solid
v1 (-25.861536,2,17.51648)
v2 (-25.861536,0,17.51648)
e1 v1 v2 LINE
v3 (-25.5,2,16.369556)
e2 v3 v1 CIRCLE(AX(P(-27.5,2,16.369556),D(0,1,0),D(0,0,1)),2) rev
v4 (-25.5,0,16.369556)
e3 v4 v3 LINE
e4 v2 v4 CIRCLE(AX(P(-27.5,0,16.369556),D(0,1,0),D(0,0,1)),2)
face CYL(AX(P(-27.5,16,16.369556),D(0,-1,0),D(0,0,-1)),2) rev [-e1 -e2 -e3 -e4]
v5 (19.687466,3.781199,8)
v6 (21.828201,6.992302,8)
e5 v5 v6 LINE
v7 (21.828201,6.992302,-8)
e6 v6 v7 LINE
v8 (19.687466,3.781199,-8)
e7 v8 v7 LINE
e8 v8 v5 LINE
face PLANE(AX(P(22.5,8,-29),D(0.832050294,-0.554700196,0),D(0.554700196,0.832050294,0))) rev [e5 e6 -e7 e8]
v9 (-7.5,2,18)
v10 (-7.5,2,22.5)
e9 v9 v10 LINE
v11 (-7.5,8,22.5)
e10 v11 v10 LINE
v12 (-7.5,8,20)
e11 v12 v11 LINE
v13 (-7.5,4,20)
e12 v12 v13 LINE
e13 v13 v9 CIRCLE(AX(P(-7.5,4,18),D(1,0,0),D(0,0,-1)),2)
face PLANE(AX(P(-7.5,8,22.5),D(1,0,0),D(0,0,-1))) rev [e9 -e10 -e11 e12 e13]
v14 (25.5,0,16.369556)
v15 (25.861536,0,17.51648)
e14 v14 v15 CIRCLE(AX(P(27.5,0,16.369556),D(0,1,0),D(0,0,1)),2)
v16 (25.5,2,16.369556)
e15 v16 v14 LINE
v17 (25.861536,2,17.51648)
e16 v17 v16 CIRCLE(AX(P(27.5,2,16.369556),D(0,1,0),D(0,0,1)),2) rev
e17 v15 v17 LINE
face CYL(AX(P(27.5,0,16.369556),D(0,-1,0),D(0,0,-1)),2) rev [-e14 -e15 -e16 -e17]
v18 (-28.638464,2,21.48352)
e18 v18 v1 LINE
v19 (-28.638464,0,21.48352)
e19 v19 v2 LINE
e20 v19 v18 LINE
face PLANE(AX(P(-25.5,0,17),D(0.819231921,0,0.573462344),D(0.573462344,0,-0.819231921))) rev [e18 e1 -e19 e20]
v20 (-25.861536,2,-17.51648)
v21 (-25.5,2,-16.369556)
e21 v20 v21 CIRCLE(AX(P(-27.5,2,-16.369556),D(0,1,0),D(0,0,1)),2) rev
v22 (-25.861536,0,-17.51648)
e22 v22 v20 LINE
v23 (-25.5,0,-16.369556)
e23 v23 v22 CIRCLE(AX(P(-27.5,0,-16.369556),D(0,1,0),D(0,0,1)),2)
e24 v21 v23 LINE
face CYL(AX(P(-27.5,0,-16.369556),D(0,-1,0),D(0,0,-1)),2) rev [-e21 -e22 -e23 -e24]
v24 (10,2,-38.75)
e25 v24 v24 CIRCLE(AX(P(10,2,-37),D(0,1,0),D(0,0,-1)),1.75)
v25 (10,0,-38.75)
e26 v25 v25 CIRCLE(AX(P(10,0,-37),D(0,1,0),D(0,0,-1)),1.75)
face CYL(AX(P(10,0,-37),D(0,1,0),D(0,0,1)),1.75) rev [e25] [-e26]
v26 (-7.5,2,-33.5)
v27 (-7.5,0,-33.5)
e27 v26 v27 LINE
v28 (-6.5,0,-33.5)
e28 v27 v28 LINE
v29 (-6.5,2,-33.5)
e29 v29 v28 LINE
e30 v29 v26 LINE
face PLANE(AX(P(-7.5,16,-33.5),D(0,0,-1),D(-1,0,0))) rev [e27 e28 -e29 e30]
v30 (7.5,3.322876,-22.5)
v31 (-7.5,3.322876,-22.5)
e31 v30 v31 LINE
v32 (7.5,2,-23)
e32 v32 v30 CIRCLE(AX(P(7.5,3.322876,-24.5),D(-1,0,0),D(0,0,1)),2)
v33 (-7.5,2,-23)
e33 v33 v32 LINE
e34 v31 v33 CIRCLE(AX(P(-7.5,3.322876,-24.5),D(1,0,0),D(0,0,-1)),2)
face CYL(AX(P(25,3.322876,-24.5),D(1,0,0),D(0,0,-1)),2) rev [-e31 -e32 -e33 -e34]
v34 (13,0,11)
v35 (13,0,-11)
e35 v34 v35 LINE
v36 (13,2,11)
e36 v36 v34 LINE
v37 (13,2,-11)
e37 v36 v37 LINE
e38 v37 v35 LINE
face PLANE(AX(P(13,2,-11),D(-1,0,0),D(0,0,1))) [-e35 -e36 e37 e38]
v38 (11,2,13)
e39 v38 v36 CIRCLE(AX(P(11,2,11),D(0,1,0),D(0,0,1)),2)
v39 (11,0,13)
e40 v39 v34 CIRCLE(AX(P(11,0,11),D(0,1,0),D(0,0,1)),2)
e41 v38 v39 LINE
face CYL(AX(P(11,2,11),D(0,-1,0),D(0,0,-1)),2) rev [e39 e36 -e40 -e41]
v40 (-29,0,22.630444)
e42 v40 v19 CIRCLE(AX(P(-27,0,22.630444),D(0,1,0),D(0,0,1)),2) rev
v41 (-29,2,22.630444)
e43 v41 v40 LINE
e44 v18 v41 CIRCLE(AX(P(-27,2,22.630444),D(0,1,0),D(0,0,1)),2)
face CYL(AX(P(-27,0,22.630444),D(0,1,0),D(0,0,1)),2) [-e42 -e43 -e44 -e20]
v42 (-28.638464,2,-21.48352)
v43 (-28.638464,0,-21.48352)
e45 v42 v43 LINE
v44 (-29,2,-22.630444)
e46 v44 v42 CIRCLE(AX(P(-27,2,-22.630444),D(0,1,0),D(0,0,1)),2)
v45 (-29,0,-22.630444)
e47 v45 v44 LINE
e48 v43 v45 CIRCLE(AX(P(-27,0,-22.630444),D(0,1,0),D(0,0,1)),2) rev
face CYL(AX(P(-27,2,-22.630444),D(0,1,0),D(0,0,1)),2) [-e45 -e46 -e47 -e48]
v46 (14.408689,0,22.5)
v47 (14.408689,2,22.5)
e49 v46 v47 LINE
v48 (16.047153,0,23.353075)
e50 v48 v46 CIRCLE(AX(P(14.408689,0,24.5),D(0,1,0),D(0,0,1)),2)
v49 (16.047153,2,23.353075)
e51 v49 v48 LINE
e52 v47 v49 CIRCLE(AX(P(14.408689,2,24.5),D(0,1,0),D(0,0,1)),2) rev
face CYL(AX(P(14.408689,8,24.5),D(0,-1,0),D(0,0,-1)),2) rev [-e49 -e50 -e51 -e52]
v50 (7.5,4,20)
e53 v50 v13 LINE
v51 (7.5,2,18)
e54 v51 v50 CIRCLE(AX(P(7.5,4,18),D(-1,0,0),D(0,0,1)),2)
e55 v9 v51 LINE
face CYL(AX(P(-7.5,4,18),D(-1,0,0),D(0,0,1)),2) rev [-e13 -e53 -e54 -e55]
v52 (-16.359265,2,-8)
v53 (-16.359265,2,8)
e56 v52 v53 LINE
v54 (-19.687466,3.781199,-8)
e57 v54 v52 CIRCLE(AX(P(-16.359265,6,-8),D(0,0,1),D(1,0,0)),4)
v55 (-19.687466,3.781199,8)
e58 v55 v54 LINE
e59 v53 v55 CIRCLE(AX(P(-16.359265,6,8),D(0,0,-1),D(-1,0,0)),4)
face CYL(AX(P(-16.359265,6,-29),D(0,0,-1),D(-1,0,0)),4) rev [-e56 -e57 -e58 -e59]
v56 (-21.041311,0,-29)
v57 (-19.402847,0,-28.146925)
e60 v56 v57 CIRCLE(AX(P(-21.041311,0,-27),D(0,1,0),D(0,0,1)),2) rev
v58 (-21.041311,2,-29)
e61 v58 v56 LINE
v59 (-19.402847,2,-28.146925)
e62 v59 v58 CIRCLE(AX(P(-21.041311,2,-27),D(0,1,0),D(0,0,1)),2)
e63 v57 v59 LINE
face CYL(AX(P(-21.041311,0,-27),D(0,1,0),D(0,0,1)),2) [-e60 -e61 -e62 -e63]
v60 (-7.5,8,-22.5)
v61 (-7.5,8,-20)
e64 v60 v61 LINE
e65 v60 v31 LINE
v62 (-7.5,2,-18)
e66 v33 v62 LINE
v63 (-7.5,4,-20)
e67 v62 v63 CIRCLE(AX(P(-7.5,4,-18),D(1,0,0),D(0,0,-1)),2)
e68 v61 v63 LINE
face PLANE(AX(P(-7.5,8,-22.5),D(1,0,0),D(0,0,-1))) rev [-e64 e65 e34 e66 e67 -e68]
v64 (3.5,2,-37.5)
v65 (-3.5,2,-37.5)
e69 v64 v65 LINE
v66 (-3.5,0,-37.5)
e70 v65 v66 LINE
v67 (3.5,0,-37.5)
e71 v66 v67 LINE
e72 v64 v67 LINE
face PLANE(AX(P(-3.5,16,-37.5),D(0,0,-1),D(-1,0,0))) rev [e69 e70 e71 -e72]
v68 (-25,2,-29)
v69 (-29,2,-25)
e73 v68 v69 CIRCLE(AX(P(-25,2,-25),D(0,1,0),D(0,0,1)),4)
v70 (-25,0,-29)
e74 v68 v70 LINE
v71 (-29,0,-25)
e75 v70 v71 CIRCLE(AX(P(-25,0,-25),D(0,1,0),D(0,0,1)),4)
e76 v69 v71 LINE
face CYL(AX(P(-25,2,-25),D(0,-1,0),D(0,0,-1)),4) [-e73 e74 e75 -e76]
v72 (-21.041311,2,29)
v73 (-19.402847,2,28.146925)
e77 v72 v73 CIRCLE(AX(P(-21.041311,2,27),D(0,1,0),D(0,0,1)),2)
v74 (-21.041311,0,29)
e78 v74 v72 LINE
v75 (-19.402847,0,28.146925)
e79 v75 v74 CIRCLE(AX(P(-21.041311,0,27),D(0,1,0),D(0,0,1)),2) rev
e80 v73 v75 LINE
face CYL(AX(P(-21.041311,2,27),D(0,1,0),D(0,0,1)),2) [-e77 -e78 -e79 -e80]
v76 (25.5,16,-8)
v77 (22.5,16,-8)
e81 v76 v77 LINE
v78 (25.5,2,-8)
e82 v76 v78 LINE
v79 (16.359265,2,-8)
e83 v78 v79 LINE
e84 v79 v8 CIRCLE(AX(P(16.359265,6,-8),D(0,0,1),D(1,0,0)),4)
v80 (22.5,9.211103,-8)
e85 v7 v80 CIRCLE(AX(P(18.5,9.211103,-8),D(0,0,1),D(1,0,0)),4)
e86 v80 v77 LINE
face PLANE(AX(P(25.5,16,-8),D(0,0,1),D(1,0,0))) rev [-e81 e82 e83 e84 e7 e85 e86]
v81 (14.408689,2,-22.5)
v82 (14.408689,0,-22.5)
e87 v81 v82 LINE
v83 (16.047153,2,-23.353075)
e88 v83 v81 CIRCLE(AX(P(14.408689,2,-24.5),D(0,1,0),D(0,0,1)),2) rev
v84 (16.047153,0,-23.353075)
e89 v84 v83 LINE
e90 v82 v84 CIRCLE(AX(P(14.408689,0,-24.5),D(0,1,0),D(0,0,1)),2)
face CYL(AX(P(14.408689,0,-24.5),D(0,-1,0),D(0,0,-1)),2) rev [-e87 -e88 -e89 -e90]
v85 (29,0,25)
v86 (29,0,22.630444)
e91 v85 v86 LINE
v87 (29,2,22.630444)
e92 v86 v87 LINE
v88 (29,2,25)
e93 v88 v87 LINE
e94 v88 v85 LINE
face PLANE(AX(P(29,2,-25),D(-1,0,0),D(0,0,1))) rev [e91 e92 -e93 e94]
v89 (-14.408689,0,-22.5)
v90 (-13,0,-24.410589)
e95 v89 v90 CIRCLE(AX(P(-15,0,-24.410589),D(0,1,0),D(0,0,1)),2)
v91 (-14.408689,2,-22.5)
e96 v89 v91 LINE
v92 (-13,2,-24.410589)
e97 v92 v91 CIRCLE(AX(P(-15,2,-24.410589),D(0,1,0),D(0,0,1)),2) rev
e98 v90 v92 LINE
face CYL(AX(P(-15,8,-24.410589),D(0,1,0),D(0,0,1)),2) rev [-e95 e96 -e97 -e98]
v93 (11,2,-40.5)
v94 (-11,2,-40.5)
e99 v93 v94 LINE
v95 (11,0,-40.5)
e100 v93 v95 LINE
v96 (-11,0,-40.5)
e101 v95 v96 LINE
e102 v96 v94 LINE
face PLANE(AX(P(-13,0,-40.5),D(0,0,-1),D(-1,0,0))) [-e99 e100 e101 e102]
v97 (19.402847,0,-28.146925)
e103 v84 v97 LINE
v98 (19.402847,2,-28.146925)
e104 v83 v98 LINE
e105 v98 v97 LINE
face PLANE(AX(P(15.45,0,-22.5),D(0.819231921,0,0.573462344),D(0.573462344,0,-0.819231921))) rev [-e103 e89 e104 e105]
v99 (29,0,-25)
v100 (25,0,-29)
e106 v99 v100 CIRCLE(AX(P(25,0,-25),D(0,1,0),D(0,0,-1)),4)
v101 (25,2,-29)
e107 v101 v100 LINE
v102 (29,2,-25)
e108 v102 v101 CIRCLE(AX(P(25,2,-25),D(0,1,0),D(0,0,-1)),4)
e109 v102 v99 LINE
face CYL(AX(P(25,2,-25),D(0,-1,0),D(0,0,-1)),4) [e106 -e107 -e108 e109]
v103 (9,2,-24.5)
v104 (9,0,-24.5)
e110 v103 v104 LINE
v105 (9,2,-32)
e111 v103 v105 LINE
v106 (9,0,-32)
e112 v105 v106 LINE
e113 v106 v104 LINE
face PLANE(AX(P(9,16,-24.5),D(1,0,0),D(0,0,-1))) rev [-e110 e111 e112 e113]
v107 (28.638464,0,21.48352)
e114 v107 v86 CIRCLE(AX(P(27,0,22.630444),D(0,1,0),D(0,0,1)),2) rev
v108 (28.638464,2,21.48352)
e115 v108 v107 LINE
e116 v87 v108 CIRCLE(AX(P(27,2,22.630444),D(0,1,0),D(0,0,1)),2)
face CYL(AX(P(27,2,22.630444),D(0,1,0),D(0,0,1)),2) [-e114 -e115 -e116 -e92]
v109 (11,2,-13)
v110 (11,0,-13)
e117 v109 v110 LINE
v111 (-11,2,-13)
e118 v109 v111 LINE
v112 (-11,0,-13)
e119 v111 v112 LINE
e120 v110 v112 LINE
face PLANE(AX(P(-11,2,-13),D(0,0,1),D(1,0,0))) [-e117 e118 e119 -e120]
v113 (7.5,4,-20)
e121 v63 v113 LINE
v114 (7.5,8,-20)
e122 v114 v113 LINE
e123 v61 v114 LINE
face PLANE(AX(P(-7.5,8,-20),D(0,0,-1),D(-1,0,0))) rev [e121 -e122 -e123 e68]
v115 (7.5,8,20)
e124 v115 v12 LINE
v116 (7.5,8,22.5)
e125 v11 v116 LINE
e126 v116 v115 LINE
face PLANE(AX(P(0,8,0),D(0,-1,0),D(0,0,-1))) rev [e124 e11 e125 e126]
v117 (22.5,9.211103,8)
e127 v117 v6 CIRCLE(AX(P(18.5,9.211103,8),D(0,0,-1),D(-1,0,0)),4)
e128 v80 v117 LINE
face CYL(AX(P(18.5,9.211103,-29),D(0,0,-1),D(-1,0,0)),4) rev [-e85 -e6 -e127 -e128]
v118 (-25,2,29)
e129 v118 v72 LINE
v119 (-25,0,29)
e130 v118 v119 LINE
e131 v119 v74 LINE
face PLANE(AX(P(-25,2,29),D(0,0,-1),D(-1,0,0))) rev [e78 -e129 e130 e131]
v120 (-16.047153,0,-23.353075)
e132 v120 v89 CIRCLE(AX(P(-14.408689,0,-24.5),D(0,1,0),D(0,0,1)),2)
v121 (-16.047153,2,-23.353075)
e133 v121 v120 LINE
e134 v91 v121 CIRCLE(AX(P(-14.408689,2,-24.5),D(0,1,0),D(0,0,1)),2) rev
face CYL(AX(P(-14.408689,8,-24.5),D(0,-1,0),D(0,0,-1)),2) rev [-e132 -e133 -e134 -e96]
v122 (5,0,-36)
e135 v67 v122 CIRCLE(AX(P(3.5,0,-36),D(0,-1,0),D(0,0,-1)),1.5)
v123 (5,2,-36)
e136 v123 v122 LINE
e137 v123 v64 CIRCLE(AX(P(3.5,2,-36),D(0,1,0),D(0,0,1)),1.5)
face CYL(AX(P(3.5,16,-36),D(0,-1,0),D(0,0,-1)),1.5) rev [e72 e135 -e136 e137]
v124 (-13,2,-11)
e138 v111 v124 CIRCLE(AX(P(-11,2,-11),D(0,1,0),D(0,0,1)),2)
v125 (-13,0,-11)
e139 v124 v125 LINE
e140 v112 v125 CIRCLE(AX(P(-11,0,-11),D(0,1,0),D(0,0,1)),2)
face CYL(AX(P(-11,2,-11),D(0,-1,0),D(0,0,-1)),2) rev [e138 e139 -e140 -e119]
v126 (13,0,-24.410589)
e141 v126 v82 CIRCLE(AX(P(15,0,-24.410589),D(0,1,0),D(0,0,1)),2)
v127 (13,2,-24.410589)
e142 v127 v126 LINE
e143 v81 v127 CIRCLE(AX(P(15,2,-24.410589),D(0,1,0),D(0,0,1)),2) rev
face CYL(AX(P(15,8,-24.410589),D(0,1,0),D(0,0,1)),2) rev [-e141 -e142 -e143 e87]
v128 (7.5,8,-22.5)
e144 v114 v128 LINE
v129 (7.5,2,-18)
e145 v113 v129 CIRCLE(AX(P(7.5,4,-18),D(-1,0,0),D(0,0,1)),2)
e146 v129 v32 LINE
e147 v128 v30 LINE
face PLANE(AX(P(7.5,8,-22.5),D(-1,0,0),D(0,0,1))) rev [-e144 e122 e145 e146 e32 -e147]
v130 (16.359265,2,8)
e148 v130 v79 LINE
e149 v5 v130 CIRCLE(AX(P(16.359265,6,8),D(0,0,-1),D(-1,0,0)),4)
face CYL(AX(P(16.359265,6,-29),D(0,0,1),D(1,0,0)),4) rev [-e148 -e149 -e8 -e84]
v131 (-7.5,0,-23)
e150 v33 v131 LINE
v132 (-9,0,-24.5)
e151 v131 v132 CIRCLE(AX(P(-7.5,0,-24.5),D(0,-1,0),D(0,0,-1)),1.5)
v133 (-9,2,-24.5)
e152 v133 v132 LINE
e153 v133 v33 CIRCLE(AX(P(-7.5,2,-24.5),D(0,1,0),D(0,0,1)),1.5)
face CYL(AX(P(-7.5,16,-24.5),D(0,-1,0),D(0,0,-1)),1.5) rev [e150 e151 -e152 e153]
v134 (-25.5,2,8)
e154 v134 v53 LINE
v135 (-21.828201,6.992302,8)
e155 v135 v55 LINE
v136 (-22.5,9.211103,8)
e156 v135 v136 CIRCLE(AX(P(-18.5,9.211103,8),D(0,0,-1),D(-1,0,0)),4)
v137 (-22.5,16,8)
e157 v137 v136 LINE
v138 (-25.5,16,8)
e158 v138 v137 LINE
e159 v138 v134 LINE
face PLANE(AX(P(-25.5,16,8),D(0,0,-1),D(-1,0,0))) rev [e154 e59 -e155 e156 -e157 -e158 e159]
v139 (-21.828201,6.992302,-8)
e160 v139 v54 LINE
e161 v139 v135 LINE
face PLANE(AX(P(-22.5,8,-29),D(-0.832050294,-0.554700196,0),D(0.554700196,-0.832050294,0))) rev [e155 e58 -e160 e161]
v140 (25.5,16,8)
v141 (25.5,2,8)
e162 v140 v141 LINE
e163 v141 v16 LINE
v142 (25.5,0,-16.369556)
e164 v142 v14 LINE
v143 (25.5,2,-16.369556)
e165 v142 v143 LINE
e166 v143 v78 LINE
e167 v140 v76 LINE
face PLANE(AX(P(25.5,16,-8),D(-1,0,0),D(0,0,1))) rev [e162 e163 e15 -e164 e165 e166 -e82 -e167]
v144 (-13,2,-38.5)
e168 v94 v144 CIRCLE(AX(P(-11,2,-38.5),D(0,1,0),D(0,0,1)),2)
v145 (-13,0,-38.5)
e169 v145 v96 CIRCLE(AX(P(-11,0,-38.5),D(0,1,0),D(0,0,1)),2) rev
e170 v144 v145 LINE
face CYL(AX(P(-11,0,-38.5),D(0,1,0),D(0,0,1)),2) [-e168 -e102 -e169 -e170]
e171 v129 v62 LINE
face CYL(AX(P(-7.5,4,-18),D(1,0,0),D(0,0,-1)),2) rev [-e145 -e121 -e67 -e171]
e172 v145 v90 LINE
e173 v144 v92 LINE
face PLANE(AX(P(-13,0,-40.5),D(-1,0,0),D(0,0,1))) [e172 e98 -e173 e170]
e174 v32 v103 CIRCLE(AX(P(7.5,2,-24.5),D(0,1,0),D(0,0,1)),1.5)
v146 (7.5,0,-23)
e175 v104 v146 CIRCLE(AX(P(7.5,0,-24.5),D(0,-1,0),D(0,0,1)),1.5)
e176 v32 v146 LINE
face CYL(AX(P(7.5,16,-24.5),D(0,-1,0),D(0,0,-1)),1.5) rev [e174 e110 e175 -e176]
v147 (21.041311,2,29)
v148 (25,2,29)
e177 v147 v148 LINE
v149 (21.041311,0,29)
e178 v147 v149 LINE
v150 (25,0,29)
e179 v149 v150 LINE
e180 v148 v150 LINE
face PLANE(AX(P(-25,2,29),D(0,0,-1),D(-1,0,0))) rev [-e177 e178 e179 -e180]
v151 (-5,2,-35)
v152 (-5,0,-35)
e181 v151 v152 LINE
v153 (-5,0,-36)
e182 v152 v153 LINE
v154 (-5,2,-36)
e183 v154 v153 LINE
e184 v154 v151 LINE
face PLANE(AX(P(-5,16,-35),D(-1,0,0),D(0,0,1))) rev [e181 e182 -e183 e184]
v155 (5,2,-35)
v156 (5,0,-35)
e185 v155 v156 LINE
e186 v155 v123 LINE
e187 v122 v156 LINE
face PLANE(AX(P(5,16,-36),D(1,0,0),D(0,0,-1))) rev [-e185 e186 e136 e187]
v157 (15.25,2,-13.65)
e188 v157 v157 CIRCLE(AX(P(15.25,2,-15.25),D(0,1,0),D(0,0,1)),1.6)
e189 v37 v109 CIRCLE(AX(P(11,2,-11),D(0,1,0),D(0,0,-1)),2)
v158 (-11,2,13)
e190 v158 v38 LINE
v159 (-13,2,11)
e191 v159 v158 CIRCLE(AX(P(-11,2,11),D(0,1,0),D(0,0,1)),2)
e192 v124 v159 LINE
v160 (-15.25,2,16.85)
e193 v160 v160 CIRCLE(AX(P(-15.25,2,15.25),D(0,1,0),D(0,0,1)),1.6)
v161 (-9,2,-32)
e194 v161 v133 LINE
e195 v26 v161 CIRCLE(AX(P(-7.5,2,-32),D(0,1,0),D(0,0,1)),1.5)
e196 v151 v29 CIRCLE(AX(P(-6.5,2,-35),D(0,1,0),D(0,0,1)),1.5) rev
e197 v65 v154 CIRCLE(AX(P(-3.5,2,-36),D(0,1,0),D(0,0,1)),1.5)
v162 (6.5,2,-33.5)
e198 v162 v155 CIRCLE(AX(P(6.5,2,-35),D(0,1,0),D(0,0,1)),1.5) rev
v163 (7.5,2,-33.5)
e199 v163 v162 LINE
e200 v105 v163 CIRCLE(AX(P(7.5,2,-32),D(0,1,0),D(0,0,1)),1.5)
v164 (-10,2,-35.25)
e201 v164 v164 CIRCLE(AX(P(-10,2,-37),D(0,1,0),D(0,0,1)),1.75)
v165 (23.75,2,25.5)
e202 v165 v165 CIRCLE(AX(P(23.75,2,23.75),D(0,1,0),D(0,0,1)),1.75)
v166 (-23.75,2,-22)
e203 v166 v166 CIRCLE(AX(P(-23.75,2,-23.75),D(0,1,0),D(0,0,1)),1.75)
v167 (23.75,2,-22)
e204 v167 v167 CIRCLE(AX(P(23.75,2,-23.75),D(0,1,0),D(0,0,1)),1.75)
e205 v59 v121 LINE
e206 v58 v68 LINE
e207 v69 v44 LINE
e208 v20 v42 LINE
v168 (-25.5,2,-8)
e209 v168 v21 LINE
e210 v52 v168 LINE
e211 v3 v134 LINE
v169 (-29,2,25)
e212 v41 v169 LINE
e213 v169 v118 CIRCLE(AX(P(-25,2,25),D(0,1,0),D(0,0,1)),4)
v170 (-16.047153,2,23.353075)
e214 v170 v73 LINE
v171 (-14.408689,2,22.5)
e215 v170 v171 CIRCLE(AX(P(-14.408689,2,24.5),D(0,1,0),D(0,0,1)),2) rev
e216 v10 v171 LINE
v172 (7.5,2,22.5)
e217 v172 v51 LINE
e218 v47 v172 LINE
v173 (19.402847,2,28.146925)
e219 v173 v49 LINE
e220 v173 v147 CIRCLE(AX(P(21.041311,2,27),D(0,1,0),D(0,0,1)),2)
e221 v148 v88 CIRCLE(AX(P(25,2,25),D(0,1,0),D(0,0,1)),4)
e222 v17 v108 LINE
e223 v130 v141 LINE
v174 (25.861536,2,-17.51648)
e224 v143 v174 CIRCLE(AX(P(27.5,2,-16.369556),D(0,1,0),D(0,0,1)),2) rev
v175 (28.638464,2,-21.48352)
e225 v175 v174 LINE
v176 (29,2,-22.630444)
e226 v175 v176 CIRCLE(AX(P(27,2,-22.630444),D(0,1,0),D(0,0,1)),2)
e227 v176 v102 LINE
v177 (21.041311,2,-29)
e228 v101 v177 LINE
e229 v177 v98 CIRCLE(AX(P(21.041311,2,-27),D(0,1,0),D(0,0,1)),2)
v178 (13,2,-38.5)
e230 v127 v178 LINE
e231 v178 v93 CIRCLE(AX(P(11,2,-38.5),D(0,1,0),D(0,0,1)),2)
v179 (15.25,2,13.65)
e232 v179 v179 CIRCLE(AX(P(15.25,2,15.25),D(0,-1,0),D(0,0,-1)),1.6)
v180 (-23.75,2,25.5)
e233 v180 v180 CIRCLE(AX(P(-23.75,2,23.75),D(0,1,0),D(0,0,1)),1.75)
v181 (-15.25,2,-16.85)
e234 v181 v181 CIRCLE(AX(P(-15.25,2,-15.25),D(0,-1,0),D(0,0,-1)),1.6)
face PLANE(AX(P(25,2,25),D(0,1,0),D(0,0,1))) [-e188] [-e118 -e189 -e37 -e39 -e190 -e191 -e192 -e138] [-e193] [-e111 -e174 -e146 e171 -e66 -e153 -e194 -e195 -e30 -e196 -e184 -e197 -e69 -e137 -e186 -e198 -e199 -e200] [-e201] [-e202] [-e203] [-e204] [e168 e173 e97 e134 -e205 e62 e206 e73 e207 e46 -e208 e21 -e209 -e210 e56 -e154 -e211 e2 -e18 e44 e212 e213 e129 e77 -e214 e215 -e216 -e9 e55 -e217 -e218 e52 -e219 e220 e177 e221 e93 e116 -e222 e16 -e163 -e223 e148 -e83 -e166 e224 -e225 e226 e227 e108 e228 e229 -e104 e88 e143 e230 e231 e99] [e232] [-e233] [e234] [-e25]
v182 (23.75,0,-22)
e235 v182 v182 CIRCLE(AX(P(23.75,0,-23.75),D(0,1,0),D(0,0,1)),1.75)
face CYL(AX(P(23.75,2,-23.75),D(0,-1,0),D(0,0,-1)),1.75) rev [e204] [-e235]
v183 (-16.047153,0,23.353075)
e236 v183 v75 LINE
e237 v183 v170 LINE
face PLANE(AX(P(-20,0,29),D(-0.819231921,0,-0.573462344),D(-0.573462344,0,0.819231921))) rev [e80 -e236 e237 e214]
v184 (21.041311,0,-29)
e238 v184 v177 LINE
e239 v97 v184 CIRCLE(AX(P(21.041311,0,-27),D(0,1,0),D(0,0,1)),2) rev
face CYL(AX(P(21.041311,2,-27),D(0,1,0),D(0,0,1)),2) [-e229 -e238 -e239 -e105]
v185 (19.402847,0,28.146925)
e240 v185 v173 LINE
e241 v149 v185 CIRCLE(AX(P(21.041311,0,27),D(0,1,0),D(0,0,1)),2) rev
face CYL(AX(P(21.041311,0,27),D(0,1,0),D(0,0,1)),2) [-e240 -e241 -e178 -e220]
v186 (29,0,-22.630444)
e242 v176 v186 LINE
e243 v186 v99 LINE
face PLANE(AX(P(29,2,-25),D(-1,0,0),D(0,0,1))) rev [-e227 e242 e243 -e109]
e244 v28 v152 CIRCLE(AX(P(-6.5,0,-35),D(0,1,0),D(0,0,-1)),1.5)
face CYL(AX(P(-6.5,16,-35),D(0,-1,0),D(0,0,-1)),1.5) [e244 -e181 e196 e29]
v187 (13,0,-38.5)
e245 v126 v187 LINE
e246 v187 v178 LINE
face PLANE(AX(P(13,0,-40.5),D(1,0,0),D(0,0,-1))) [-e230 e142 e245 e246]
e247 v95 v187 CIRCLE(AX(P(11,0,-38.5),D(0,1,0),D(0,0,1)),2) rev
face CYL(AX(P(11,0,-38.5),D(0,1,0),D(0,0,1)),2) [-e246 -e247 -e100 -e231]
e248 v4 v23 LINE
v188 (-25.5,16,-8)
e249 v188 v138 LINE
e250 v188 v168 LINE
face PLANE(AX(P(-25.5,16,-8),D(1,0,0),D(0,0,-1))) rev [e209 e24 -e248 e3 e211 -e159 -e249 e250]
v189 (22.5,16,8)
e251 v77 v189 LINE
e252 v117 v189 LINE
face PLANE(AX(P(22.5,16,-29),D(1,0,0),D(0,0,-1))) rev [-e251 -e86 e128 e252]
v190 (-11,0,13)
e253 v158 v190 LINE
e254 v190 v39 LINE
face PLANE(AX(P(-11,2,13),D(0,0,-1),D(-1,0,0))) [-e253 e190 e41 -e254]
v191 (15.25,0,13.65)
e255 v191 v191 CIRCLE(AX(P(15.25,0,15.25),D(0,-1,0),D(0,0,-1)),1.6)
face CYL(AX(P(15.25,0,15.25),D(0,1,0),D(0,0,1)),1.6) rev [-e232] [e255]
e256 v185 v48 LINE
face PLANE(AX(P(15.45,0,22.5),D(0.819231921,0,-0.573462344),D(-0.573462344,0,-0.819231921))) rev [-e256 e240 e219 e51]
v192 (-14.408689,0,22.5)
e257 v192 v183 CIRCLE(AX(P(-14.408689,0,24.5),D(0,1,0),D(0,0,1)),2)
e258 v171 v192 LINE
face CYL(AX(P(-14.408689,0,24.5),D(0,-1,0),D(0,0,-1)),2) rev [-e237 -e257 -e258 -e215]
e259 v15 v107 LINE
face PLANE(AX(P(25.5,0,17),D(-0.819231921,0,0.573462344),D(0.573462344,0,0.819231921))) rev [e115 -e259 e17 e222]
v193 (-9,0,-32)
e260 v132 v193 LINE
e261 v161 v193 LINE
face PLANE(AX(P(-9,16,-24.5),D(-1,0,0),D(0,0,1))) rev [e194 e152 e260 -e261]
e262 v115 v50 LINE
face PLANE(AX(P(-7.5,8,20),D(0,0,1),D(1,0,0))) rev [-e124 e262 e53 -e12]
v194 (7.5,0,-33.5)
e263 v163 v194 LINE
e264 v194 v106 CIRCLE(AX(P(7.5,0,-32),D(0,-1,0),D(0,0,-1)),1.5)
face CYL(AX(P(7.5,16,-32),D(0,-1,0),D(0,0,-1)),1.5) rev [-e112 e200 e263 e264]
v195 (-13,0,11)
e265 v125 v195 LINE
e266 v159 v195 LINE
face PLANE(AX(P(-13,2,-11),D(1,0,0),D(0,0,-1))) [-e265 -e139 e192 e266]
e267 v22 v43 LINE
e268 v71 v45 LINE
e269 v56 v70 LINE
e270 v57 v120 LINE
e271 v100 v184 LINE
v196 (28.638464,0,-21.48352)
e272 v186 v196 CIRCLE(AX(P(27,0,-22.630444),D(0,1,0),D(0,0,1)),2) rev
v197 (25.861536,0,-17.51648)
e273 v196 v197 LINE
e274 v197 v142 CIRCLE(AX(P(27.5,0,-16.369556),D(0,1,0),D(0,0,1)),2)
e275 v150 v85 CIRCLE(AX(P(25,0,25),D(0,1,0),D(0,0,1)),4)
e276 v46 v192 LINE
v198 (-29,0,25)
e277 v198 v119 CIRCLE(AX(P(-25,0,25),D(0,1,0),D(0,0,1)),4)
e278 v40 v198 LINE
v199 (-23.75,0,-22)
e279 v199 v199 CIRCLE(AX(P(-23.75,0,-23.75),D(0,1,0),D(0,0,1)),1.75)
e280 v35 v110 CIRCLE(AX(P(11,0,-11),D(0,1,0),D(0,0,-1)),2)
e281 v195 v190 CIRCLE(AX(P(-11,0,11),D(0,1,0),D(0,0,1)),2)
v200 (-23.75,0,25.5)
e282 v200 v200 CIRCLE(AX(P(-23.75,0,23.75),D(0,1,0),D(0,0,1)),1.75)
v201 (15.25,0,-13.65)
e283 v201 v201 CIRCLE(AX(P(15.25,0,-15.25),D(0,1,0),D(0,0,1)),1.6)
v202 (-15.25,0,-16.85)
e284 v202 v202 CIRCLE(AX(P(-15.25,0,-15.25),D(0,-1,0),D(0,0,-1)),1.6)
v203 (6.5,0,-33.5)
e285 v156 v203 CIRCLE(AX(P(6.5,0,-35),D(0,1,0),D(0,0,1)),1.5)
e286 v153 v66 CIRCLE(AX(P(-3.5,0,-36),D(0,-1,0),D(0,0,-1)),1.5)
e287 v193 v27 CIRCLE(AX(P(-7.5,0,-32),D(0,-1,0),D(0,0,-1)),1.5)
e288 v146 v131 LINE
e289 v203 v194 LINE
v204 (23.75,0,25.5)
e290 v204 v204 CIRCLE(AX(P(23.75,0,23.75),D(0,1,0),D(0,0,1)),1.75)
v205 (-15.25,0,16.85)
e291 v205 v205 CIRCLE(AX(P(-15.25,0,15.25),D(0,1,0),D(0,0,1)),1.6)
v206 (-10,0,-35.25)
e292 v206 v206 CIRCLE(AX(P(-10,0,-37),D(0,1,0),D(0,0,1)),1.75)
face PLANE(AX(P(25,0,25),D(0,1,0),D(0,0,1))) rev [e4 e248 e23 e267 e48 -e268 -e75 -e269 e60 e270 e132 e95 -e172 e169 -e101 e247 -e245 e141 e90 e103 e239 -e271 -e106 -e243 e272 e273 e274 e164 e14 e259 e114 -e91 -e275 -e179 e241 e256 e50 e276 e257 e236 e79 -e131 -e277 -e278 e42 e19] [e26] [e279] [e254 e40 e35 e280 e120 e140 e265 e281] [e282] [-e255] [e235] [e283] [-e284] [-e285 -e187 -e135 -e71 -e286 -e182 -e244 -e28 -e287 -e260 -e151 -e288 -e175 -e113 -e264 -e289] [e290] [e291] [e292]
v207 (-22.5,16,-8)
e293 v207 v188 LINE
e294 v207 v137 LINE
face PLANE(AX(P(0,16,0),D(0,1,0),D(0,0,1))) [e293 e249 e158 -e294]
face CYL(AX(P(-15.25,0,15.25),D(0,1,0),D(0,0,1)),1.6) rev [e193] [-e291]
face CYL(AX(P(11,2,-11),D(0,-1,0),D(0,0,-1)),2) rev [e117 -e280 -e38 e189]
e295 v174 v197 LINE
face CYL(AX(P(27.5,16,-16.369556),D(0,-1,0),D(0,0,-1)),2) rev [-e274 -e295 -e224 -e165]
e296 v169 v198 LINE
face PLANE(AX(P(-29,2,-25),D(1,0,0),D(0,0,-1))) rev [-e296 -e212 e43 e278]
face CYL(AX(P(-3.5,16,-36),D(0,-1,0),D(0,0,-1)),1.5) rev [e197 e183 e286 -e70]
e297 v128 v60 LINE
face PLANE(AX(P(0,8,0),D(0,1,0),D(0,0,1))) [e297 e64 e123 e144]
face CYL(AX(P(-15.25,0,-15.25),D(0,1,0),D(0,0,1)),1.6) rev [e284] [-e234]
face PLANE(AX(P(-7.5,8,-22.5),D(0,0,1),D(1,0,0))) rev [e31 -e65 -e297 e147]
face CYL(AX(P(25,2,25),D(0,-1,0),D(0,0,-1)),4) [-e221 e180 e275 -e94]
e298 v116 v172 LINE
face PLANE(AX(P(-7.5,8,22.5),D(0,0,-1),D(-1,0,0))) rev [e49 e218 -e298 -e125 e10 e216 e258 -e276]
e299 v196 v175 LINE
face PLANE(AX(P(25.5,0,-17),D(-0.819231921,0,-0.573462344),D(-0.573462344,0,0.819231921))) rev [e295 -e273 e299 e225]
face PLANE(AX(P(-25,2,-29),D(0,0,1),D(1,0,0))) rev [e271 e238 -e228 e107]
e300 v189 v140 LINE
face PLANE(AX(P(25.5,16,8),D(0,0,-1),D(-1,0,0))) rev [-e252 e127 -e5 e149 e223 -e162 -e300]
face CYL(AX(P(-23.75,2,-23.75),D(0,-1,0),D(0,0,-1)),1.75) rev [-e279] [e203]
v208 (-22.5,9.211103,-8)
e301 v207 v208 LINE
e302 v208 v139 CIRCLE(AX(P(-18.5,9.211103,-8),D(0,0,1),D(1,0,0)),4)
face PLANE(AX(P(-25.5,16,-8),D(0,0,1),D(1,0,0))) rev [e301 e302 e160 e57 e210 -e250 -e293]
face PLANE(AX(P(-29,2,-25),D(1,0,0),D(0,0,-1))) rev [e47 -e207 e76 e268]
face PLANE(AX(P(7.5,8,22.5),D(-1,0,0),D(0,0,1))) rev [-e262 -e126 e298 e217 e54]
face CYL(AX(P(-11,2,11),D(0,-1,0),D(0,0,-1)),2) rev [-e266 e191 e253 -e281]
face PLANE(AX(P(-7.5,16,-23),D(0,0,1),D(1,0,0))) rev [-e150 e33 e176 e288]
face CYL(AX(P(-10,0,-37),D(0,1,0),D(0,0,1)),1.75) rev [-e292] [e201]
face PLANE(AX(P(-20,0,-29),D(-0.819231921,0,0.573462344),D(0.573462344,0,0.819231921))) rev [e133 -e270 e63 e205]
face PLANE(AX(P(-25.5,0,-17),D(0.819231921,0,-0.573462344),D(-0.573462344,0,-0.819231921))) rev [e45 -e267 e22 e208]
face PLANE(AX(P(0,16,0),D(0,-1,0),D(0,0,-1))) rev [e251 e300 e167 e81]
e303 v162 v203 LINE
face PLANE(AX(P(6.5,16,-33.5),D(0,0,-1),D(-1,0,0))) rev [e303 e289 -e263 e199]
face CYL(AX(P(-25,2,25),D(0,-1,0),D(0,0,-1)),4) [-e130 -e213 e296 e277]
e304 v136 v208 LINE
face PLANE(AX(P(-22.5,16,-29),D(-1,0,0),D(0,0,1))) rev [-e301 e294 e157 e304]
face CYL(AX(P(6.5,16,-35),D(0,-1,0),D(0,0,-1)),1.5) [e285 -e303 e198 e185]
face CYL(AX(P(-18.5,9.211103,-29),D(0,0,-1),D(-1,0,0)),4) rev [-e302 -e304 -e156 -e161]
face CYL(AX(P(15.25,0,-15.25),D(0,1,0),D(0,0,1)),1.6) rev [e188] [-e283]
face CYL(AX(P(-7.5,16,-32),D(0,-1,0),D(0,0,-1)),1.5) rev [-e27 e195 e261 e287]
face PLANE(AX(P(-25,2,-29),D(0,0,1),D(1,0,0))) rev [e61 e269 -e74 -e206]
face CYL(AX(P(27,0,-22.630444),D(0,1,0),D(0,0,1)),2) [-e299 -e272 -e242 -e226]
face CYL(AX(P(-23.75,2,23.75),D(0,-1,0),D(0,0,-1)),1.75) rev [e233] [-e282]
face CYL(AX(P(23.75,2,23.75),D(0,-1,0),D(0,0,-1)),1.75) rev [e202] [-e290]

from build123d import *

# Parameters (mm, degrees)
SKETCH1_R                 = 1.75
BASE_DEPTH                = 2
SKETCH2_W                 = 7
SKETCH2_H                 = 16
SIDE_BATTERY_GUIDES_DEPTH = 14
CUT_EXTRUDE1_DEPTH        = 50.658836072
SKETCH5_W                 = 15
SKETCH5_H                 = 2.5
BOSS_EXTRUDE3_DEPTH       = 6
CUT_EXTRUDE2_DEPTH        = 44.33589736
FILLET2_R                 = 2
SKETCH7_R                 = 1.6
CUT_EXTRUDE3_DEPTH        = 44.33589736
SKETCH8_W                 = 26
SKETCH8_H                 = 18
SKETCH8_R                 = 1.75
PINOUT_BD_HOLDER_DEPTH    = 2
WEIGH_REDUCER_DEPTH       = 53.318734694
FILLET3_R                 = 4
FILLET4_R                 = 2
FILLET5_DEPTH             = 2
FILLET5_START             = -7.5
FILLET5_2_DEPTH           = 15
FILLET5_START_2           = -1
FILLET5_3_DEPTH           = 4


with BuildPart() as part:
    # Sketch1 → base (new body)
    with BuildSketch(Plane(origin=(0, 0, 0), x_dir=(1, 0, 0), z_dir=(0, 1, 0))):
        with BuildLine():
            Line((-25, 29), (25, 29))
            ThreePointArc((25, 29), (27.828427125, 27.828427125), (29, 25))
            Line((29, 25), (29, -25))
            ThreePointArc((29, -25), (27.828427125, -27.828427125), (25, -29))
            Line((25, -29), (-25, -29))
            ThreePointArc((-25, -29), (-27.828427125, -27.828427125), (-29, -25))
            Line((-29, -25), (-29, 25))
            ThreePointArc((-29, 25), (-27.828427125, 27.828427125), (-25, 29))
        make_face()
        with Locations(Location((23.75, 23.75, 0), (0, 0, 270))):
            Circle(SKETCH1_R, mode=Mode.SUBTRACT)
        with Locations(Location((23.75, -23.75, 0), (0, 0, 270))):
            Circle(SKETCH1_R, mode=Mode.SUBTRACT)
        with Locations(Location((-23.75, -23.75, 0), (0, 0, 270))):
            Circle(SKETCH1_R, mode=Mode.SUBTRACT)
        with Locations(Location((-23.75, 23.75, 0), (0, 0, 270))):
            Circle(SKETCH1_R, mode=Mode.SUBTRACT)
        with BuildLine():
            Line((-11, 13), (11, 13))
            ThreePointArc((11, 13), (12.414213562, 12.414213562), (13, 11))
            Line((13, 11), (13, -11))
            ThreePointArc((13, -11), (12.414213562, -12.414213562), (11, -13))
            Line((11, -13), (-11, -13))
            ThreePointArc((-11, -13), (-12.414213562, -12.414213562), (-13, -11))
            Line((-13, -11), (-13, 11))
            ThreePointArc((-13, 11), (-12.414213562, 12.414213562), (-11, 13))
        make_face(mode=Mode.SUBTRACT)
    extrude(amount=BASE_DEPTH)

    # Sketch2 → side battery guides (add)
    with BuildSketch(Plane(origin=(0, 2, 0), x_dir=(1, 0, 0), z_dir=(0, 1, 0))):
        with Locations((-22, 0)):
            Rectangle(SKETCH2_W, SKETCH2_H)
        with Locations((22, 0)):
            Rectangle(SKETCH2_W, SKETCH2_H)
    extrude(amount=SIDE_BATTERY_GUIDES_DEPTH)

    # Sketch4 → Cut-Extrude1 (cut, through all)
    with BuildSketch(Plane.XY.offset(8)):
        Polygon((-18.5, 16), (-22.5, 16), (-22.5, 8), (-18.5, 2), align=None)
        Polygon((18.5, 2), (18.5, 16), (22.5, 16), (22.5, 8), align=None)
    extrude(amount=-CUT_EXTRUDE1_DEPTH, mode=Mode.SUBTRACT)

    # Sketch5 → Boss-Extrude3 (add)
    with BuildSketch(Plane(origin=(0, 2, 0), x_dir=(1, 0, 0), z_dir=(0, 1, 0))):
        with Locations((0, 21.25)):
            Rectangle(SKETCH5_W, SKETCH5_H)
        with Locations((0, -21.25)):
            Rectangle(SKETCH5_W, SKETCH5_H)
    extrude(amount=BOSS_EXTRUDE3_DEPTH)

    # Sketch6 → Cut-Extrude2 (cut, through all)
    with BuildSketch(Plane(origin=(0, 2, 0), x_dir=(1, 0, 0), z_dir=(0, 1, 0))):
        Polygon((-25.5, 8), (-25.5, 17), (-29, 22), (-29, -22), (-25.5, -17), (-25.5, -8), align=None)
        Polygon((-15.45, -22.5), (-7.5, -22.5), (7.5, -22.5), (15.45, -22.5), (20, -29), (-20, -29), align=None)
        Polygon((29, 22), (29, -22), (25.5, -17), (25.5, -8), (25.5, 8), (25.5, 17), align=None)
        Polygon((-7.5, 22.5), (7.5, 22.5), (15.45, 22.5), (20, 29), (-20, 29), (-15.45, 22.5), align=None)
    extrude(amount=-CUT_EXTRUDE2_DEPTH, mode=Mode.SUBTRACT)

    # Fillet2
    fillet2_edges = [part.edges().sort_by_distance(p)[0] for p in [
        (-25.5, 1, -17),
        (-25.5, 1, 17),
        (-29, 1, 22),
        (-29, 1, -22),
        (-20, 1, 29),
        (-15.45, 1, 22.5),
        (15.45, 1, 22.5),
        (20, 1, 29),
        (25.5, 1, -17),
        (29, 1, -22),
        (29, 1, 22),
        (25.5, 1, 17),
        (-15.45, 1, -22.5),
        (-20, 1, -29),
        (20, 1, -29),
        (15.45, 1, -22.5),
    ]]
    fillet(fillet2_edges, radius=FILLET2_R)

    # Sketch7 → Cut-Extrude3 (cut, through all)
    with BuildSketch(Plane(origin=(0, 2, 0), x_dir=(1, 0, 0), z_dir=(0, 1, 0))):
        with Locations(Location((15.25, 15.25, 0), (0, 0, 270))):
            Circle(SKETCH7_R)
        with Locations(Location((15.25, -15.25, 0), (0, 0, 90))):
            Circle(SKETCH7_R)
        with Locations(Location((-15.25, -15.25, 0), (0, 0, 270))):
            Circle(SKETCH7_R)
        with Locations(Location((-15.25, 15.25, 0), (0, 0, 90))):
            Circle(SKETCH7_R)
    extrude(amount=-CUT_EXTRUDE3_DEPTH, mode=Mode.SUBTRACT)

    # Sketch8 → pinout_bd_holder (add)
    with BuildSketch(Plane(origin=(0, 2, 0), x_dir=(1, 0, 0), z_dir=(0, 1, 0))):
        with Locations((0, 31.5)):
            Rectangle(SKETCH8_W, SKETCH8_H)
        with Locations(Location((-10, 37, 0), (0, 0, 270))):
            Circle(SKETCH8_R, mode=Mode.SUBTRACT)
        with Locations(Location((10, 37, 0), (0, 0, 90))):
            Circle(SKETCH8_R, mode=Mode.SUBTRACT)
    extrude(amount=-PINOUT_BD_HOLDER_DEPTH)

    # Sketch9 → Weigh-Reducer (cut, through all)
    with BuildSketch(Plane.XZ):
        with BuildLine():
            Line((-7.5, -23), (7.5, -23))
            ThreePointArc((7.5, -23), (8.560660172, -23.439339828), (9, -24.5))
            Line((9, -24.5), (9, -32))
            ThreePointArc((9, -32), (8.560660172, -33.060660172), (7.5, -33.5))
            Line((7.5, -33.5), (6.5, -33.5))
            ThreePointArc((6.5, -33.5), (5.439339828, -33.939339828), (5, -35))
            Line((5, -35), (5, -36))
            ThreePointArc((5, -36), (4.560660172, -37.060660172), (3.5, -37.5))
            Line((3.5, -37.5), (-3.5, -37.5))
            ThreePointArc((-3.5, -37.5), (-4.560660172, -37.060660172), (-5, -36))
            Line((-5, -36), (-5, -35))
            ThreePointArc((-5, -35), (-5.439339828, -33.939339828), (-6.5, -33.5))
            Line((-6.5, -33.5), (-7.5, -33.5))
            ThreePointArc((-7.5, -33.5), (-8.560660172, -33.060660172), (-9, -32))
            Line((-9, -32), (-9, -24.5))
            ThreePointArc((-9, -24.5), (-8.560660172, -23.439339828), (-7.5, -23))
        make_face()
    extrude(amount=-WEIGH_REDUCER_DEPTH, mode=Mode.SUBTRACT)

    # Fillet3
    fillet3_edges = [part.edges().sort_by_distance(p)[0] for p in [
        (22.5, 8, 0),
        (-18.5, 2, 0),
        (18.5, 2, 0),
        (-22.5, 8, 0),
    ]]
    fillet(fillet3_edges, radius=FILLET3_R)

    # Fillet4
    fillet4_edges = [part.edges().sort_by_distance(p)[0] for p in [
        (0, 2, -20),
        (0, 2, 20),
    ]]
    fillet(fillet4_edges, radius=FILLET4_R)

    # Fillet5: read off the stored shape, not the designer's step
    # Fillet5 outline → Fillet5 (add)
    with BuildSketch(Plane(origin=(0, 0, 0), x_dir=(1, 0, 0), z_dir=(0, 1, 0))):
        with BuildLine():
            Line((-13, 22.5), (-13, 24.410589217))
            ThreePointArc((-13, 24.410589217), (-13.390245011, 23.223707219), (-14.408688877, 22.5))
            Line((-14.408688877, 22.5), (-13, 22.5))
        make_face()
        with BuildLine():
            ThreePointArc((14.408688877, 22.5), (13.390245011, 23.223707219), (13, 24.410589217))
            Line((13, 24.410589217), (13, 22.5))
            Line((13, 22.5), (14.408688877, 22.5))
        make_face()
    extrude(amount=FILLET5_DEPTH)

    # Fillet5 2 outline → Fillet5 2 (add)
    with BuildSketch(Plane.YZ.offset(FILLET5_START)):
        with BuildLine():
            ThreePointArc((2, -23), (2.615768875, -22.629171307), (3.322875656, -22.5))
            Line((3.322875656, -22.5), (2, -22.5))
            Line((2, -22.5), (2, -23))
        make_face()
    extrude(amount=FILLET5_2_DEPTH)

    # Fillet5 3 outline → Fillet5 3 (cut)
    with BuildSketch(Plane(origin=(0, 0, 0), x_dir=(1, 0, 0), z_dir=(0, 1, 0)).offset(FILLET5_START_2)):
        with BuildLine():
            ThreePointArc((-13, 38.5), (-12.414213562, 39.914213562), (-11, 40.5))
            Line((-11, 40.5), (-13, 40.5))
            Line((-13, 40.5), (-13, 38.5))
        make_face()
        with BuildLine():
            ThreePointArc((11, 40.5), (12.414213562, 39.914213562), (13, 38.5))
            Line((13, 38.5), (13, 40.5))
            Line((13, 40.5), (11, 40.5))
        make_face()
    extrude(amount=FILLET5_3_DEPTH, mode=Mode.SUBTRACT)


solid = part.part
